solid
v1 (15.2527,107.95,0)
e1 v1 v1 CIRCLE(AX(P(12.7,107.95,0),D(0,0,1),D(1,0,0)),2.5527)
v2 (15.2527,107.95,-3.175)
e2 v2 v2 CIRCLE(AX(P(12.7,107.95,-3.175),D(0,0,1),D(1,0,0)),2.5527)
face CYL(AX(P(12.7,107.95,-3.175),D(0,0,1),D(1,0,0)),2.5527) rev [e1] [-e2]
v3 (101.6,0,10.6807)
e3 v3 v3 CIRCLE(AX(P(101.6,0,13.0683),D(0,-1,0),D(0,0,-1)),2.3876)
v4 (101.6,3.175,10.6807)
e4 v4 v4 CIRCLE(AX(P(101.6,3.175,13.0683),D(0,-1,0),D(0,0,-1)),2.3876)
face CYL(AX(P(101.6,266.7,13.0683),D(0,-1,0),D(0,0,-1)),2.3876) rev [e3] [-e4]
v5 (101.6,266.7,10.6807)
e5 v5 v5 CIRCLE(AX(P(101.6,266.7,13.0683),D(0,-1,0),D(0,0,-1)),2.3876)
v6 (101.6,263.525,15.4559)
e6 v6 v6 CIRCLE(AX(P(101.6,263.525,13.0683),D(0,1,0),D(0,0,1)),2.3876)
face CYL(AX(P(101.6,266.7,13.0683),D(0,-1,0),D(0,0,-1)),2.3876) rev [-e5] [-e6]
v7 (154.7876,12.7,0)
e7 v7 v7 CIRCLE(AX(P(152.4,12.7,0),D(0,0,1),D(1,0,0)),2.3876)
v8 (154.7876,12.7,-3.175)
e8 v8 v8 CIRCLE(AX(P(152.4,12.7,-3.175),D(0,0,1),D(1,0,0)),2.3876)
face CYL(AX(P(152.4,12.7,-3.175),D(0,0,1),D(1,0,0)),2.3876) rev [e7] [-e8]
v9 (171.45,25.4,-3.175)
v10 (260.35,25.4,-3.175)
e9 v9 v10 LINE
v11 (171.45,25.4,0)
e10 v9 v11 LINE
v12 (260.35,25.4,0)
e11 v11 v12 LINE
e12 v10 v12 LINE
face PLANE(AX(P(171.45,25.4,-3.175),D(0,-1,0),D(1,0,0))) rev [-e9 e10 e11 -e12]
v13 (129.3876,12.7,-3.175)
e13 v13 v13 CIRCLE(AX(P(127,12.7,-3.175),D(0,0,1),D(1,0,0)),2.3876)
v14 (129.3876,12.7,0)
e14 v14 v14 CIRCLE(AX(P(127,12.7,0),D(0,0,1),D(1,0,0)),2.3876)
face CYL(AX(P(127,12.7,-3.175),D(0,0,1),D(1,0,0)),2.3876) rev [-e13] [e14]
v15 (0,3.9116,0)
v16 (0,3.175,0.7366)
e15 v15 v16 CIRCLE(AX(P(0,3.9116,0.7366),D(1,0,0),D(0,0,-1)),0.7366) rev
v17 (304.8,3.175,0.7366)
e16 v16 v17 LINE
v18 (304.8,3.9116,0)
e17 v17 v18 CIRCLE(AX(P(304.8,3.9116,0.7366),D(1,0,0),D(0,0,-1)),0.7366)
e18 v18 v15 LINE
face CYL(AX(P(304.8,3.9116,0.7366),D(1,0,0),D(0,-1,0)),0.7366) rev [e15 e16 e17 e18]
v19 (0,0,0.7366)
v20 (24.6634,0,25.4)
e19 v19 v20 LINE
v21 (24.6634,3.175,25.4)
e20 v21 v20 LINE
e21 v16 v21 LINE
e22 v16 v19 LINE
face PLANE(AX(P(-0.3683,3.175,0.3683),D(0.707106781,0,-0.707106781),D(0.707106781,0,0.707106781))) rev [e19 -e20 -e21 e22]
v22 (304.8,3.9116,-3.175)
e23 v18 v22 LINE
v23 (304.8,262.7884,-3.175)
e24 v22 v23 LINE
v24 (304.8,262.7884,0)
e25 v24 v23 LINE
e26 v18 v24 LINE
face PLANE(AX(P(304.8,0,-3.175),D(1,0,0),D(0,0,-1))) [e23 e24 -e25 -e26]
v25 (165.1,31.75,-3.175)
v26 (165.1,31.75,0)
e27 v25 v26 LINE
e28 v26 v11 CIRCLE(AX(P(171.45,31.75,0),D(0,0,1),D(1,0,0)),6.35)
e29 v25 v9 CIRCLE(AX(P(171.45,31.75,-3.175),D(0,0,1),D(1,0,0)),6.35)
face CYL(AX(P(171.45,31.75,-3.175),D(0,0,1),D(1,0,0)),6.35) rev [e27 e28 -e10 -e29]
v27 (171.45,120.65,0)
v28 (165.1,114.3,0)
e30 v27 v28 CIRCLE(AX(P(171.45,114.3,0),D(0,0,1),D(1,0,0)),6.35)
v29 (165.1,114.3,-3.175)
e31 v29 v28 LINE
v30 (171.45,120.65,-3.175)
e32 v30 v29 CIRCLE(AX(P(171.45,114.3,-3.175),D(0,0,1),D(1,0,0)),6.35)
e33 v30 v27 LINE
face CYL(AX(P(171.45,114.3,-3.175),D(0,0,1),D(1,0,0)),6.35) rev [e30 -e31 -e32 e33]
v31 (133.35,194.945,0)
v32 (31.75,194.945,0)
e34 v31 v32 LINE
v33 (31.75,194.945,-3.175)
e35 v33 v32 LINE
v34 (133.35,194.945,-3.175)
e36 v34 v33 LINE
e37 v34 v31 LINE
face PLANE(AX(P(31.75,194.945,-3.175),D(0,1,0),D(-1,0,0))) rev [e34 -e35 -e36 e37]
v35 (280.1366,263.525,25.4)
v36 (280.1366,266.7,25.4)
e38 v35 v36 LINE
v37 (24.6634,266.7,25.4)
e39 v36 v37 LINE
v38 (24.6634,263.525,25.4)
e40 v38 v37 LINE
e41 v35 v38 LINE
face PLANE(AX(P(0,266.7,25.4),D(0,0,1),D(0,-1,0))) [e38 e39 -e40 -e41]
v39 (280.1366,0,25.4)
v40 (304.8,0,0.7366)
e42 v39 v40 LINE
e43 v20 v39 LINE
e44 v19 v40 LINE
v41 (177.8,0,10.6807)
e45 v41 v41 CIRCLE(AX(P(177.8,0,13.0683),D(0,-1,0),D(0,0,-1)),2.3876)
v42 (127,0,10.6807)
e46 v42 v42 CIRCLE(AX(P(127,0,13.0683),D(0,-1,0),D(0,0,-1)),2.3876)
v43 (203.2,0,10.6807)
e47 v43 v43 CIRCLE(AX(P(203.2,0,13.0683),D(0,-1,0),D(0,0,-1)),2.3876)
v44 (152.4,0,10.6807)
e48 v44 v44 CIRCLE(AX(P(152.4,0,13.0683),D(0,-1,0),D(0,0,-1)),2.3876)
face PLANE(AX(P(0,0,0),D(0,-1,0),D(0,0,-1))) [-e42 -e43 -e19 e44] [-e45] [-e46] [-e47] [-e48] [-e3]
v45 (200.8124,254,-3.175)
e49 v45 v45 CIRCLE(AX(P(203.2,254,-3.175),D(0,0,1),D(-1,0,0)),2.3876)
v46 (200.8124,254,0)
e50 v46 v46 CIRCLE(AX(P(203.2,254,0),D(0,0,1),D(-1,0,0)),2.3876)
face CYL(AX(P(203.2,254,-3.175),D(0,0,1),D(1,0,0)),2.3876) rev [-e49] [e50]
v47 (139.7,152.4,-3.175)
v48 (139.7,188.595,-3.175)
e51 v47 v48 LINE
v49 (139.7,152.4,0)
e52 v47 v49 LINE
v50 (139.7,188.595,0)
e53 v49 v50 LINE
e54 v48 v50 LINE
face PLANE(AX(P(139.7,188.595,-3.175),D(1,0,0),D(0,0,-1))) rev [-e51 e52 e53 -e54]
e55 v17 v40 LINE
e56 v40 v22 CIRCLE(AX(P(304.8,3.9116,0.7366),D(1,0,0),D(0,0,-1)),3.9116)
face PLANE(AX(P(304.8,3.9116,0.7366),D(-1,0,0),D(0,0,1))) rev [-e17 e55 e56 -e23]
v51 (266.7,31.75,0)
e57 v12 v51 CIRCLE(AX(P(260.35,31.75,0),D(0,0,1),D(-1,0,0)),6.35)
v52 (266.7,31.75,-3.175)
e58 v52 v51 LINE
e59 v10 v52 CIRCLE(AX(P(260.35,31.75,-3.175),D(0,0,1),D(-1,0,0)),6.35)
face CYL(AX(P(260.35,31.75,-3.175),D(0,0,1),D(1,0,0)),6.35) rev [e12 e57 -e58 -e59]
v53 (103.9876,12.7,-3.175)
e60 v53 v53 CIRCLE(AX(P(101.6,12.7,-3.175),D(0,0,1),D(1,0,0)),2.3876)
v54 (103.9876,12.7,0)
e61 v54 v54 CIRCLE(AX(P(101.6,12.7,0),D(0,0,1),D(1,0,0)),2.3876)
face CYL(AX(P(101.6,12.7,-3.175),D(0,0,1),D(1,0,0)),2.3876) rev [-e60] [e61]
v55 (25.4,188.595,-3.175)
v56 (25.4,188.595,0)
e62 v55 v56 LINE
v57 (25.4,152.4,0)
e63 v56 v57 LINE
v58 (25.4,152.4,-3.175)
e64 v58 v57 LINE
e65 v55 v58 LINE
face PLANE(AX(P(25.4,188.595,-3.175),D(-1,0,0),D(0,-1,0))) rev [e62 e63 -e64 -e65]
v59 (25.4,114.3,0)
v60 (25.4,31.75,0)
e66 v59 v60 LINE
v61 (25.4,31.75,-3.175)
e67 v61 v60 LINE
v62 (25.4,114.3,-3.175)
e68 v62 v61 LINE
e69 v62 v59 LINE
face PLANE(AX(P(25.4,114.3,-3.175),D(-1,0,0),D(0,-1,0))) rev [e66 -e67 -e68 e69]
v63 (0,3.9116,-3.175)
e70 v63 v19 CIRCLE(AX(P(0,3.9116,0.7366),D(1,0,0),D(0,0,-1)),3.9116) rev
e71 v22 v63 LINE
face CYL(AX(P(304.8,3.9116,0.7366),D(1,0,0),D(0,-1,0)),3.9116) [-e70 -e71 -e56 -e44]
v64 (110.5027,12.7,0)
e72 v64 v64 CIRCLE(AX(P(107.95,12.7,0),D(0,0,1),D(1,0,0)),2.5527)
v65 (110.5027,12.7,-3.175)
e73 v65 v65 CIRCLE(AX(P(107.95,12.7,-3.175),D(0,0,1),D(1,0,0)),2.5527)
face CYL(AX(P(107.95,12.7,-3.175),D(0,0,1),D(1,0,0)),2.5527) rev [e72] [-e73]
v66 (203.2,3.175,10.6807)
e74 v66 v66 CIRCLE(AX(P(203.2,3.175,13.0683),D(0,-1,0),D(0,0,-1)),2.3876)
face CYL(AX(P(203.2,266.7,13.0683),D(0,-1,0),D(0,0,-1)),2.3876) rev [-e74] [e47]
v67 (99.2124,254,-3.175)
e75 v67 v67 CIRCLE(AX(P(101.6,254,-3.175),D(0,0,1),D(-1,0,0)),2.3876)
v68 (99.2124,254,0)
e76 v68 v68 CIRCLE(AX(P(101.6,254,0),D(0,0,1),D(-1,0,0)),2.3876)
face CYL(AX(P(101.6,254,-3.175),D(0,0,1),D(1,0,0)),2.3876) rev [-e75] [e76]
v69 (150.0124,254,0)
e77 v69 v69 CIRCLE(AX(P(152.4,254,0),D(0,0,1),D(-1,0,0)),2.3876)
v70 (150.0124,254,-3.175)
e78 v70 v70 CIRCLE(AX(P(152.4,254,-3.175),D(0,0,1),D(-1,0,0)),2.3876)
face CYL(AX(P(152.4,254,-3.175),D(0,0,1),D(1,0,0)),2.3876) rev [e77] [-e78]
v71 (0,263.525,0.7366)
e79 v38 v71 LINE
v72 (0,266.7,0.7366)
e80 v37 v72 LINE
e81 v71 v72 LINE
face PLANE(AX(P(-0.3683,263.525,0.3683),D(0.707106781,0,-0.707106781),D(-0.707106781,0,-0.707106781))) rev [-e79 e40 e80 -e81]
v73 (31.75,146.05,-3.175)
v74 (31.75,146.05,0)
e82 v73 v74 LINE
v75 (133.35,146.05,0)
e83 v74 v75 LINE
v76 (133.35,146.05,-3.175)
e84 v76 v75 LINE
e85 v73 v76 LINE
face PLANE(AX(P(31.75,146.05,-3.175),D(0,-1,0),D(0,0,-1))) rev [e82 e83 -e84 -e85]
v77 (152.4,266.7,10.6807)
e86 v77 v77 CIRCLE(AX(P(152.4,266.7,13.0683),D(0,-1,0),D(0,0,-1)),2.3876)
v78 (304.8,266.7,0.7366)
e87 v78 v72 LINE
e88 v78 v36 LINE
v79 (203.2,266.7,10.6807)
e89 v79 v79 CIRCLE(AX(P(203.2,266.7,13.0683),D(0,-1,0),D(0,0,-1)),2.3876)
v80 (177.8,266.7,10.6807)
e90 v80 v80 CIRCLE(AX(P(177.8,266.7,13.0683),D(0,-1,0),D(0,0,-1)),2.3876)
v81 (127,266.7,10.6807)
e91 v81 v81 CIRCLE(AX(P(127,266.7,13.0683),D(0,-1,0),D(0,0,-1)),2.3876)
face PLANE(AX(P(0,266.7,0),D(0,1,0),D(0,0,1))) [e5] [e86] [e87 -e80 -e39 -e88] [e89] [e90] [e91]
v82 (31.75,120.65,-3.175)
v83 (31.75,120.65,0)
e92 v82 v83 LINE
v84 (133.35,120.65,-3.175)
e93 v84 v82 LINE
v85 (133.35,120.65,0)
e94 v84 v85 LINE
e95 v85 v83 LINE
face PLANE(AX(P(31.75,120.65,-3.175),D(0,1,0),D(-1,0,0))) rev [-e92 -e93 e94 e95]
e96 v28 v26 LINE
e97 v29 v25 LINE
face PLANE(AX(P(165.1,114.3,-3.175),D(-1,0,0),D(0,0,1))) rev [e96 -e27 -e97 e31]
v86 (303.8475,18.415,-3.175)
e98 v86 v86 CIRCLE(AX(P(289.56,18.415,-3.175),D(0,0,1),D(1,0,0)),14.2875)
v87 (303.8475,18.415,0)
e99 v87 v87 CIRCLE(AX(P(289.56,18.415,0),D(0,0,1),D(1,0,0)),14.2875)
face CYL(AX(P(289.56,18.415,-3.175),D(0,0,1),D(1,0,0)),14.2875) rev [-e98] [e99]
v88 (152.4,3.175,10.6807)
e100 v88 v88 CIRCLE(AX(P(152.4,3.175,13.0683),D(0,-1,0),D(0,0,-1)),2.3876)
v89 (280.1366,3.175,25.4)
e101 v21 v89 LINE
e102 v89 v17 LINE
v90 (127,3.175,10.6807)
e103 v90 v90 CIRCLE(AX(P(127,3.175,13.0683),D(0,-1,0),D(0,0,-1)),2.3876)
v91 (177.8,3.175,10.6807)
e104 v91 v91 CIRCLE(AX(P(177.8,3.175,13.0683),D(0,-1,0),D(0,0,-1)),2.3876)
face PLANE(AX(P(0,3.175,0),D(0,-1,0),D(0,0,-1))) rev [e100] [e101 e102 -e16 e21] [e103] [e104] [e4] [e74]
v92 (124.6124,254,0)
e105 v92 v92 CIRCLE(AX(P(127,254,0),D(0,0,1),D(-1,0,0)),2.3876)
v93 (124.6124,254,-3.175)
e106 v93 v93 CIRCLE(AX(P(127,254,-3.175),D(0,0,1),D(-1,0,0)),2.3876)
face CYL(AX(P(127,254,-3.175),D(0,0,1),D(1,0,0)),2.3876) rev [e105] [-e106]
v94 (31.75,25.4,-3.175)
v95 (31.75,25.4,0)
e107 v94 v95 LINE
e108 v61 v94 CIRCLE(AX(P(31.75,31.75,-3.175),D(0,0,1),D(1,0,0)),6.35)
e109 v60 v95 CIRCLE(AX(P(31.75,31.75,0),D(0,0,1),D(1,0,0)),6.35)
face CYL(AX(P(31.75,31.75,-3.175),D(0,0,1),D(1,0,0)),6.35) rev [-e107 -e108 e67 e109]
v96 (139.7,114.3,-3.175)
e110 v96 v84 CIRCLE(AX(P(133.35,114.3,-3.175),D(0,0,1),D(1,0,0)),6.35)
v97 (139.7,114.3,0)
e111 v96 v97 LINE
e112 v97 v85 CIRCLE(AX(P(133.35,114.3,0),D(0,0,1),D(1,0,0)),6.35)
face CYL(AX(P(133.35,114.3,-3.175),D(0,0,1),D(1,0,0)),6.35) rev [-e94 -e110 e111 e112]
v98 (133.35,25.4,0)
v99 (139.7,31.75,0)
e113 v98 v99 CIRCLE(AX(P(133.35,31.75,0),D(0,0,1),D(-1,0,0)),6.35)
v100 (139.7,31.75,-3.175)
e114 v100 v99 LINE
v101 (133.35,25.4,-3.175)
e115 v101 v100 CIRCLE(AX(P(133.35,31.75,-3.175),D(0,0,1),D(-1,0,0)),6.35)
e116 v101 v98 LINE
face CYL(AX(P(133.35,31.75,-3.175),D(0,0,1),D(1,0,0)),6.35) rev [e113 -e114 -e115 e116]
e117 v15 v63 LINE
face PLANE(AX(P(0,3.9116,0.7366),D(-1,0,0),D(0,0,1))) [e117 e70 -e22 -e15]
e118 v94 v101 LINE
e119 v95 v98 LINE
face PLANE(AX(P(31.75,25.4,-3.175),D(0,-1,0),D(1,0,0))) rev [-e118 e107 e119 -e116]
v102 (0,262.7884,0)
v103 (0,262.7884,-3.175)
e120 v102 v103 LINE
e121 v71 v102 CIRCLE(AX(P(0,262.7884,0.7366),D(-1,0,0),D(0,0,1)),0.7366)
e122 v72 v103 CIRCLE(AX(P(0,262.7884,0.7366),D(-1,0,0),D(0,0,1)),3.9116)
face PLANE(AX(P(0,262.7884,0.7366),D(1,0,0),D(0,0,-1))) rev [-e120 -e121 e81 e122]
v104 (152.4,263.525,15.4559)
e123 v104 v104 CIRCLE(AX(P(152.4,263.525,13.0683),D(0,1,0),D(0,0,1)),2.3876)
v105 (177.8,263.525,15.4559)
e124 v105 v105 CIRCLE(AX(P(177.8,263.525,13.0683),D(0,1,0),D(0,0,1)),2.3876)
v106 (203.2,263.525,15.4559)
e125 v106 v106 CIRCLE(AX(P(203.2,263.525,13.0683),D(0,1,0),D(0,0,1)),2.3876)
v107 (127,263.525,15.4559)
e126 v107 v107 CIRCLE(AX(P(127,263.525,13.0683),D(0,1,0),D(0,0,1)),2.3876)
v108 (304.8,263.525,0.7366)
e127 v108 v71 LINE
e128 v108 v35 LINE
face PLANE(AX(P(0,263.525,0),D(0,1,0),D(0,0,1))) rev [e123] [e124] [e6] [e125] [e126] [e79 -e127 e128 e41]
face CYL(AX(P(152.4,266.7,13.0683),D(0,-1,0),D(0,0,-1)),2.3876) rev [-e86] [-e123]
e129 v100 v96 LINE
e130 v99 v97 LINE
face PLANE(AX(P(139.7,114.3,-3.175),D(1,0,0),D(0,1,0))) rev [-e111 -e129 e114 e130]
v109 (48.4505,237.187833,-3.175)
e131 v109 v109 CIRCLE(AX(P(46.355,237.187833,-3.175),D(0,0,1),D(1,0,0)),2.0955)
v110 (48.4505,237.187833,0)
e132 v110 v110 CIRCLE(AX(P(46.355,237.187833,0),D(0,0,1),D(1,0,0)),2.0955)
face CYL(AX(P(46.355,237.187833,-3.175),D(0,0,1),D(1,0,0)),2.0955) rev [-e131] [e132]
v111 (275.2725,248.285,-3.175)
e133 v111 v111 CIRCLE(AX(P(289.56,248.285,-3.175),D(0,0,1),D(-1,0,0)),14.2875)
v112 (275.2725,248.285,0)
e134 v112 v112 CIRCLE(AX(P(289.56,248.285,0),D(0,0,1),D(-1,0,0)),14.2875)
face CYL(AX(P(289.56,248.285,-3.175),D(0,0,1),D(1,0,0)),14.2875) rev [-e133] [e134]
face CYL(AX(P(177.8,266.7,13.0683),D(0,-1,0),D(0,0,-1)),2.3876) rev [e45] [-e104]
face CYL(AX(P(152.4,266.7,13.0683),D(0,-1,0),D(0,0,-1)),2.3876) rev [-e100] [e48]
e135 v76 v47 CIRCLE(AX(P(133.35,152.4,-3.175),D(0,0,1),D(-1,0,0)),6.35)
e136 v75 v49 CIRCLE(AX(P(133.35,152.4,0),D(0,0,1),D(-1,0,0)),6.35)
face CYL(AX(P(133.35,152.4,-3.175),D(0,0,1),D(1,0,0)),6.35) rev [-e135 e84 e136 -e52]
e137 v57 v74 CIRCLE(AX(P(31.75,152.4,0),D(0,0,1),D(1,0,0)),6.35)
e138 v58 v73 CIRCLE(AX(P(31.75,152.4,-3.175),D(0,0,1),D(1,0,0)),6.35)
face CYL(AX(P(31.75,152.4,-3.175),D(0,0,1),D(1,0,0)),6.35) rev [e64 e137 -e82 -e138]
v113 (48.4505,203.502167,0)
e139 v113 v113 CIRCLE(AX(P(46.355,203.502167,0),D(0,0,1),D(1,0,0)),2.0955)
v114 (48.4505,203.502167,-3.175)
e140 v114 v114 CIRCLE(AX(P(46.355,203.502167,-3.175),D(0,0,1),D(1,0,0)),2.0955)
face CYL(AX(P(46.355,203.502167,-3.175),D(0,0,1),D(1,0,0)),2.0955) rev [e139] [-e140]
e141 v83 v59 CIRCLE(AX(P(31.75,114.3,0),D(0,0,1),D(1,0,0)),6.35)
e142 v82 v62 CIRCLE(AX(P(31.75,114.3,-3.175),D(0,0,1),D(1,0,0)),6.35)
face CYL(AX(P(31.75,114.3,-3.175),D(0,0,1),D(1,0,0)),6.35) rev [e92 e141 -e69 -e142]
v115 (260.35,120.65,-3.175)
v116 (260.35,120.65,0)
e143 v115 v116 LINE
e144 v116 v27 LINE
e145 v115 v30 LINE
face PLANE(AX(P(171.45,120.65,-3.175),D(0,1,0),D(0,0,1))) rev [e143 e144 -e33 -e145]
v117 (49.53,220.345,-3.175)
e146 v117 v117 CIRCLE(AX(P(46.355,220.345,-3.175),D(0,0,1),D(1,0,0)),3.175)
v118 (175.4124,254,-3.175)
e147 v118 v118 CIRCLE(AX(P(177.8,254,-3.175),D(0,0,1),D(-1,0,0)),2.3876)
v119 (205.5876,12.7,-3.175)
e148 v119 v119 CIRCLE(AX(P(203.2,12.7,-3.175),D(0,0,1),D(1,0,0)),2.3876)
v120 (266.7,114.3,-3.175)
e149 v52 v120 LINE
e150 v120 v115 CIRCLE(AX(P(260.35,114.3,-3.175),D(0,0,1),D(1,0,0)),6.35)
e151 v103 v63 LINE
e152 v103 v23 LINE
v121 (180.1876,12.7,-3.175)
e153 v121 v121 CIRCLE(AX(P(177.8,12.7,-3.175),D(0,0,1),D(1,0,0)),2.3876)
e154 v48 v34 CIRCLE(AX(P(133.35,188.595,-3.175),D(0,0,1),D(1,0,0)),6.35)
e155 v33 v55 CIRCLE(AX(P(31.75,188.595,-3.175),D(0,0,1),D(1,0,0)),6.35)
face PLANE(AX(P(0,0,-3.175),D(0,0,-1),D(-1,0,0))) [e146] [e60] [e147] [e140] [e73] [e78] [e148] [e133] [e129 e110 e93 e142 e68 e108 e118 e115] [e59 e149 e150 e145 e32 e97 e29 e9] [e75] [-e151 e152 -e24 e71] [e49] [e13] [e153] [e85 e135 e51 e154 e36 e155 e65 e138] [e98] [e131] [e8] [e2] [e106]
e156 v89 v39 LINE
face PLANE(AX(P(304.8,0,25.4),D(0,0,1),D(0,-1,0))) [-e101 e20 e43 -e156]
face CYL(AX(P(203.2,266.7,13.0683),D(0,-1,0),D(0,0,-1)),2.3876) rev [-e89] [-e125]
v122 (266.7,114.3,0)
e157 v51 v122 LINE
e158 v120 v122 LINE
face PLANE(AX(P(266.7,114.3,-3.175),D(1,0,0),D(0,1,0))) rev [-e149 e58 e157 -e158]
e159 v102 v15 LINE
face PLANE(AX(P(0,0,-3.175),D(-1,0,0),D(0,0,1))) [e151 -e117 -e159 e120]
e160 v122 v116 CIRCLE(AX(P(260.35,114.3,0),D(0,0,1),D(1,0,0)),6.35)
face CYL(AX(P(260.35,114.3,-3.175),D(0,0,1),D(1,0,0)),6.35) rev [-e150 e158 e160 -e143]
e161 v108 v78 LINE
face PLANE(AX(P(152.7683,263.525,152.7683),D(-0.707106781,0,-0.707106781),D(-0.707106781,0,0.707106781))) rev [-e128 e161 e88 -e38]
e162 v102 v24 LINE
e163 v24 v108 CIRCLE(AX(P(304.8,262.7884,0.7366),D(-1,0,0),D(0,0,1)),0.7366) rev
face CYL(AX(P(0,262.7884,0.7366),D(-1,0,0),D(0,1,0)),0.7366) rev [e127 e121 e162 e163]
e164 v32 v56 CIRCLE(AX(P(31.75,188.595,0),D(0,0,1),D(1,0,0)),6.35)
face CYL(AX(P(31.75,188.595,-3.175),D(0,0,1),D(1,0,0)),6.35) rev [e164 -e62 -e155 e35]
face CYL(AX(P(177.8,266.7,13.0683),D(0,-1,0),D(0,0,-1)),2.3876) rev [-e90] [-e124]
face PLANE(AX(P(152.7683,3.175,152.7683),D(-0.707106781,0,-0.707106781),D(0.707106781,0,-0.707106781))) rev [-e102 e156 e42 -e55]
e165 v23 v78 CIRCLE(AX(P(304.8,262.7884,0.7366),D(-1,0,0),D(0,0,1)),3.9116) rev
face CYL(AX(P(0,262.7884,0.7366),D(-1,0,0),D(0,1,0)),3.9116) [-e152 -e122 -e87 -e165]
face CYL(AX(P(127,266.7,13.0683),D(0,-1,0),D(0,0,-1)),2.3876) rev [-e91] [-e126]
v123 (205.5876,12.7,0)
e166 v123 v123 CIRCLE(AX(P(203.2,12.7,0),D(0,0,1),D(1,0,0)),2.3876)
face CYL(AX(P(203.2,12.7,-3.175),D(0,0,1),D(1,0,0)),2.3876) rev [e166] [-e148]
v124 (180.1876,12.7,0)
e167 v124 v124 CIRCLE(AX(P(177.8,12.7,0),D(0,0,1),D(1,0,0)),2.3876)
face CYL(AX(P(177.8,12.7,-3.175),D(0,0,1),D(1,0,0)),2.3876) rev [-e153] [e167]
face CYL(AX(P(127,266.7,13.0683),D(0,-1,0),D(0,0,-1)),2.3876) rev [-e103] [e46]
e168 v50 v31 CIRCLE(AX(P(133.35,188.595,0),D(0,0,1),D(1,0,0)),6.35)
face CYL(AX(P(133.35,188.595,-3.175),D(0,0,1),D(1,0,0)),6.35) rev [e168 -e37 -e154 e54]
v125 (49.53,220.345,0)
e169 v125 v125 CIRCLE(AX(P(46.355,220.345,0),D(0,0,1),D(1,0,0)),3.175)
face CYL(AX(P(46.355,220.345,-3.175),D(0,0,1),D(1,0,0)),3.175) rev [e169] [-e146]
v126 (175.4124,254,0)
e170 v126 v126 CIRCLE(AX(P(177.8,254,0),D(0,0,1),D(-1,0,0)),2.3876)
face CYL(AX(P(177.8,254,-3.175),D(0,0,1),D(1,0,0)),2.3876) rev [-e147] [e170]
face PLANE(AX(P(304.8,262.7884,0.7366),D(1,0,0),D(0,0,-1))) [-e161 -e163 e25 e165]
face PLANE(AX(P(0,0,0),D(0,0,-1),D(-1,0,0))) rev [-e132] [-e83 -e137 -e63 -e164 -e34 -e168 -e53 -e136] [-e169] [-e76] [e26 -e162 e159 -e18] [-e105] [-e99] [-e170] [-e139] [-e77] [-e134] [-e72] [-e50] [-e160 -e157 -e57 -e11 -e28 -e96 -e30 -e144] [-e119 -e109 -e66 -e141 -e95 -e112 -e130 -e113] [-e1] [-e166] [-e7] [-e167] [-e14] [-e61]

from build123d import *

# Parameters (mm, degrees)
SKETCH1_W                    = 304.8
SKETCH1_H                    = 266.7
SKETCH1_R                    = 14.2875
SKETCH1_R_2                  = 3.175
SKETCH1_R_3                  = 2.0955
SKETCH1_R_4                  = 2.3876
SKETCH1_R_5                  = 2.5527
BASE_FLANGE1_DEPTH           = 3.175
EDGE_FLANGE1_STRIP_W         = 14.1732
EDGE_FLANGE1_STRIP_H         = 3.175
EDGE_FLANGE1_STRIP_CUT_DEPTH = 304.8
EDGE_FLANGE1_DEPTH           = 304.8
EDGE_FLANGE2_STRIP_W         = 14.1732
EDGE_FLANGE2_STRIP_H         = 3.175
EDGE_FLANGE2_STRIP_CUT_DEPTH = 304.8
EDGE_FLANGE2_DEPTH           = 304.8
CUT_EXTRUDE1_DEPTH           = 406.80425084
CUT_EXTRUDE2_DEPTH           = 406.80425084
SKETCH15_R                   = 2.3876
CUT_EXTRUDE3_DEPTH           = 406.80425084


# Sheet-metal steps are written as plain solids
with BuildPart() as part:
    # Sketch1 → Base-Flange1 (new body)
    with BuildSketch(Plane.XY):
        with Locations((152.4, 133.35)):
            Rectangle(SKETCH1_W, SKETCH1_H)
        with Locations((289.56, 18.415)):
            Circle(SKETCH1_R, mode=Mode.SUBTRACT)
        with Locations(Location((289.56, 248.285, 0), (0, 0, 180))):
            Circle(SKETCH1_R, mode=Mode.SUBTRACT)
        with Locations((46.355, 220.345)):
            Circle(SKETCH1_R_2, mode=Mode.SUBTRACT)
        with Locations((46.355, 237.187832598)):
            Circle(SKETCH1_R_3, mode=Mode.SUBTRACT)
        with Locations((46.355, 203.502167402)):
            Circle(SKETCH1_R_3, mode=Mode.SUBTRACT)
        with Locations((152.4, 12.7)):
            Circle(SKETCH1_R_4, mode=Mode.SUBTRACT)
        with Locations((177.8, 12.7)):
            Circle(SKETCH1_R_4, mode=Mode.SUBTRACT)
        with Locations((203.2, 12.7)):
            Circle(SKETCH1_R_4, mode=Mode.SUBTRACT)
        with Locations((127, 12.7)):
            Circle(SKETCH1_R_4, mode=Mode.SUBTRACT)
        with Locations((101.6, 12.7)):
            Circle(SKETCH1_R_4, mode=Mode.SUBTRACT)
        with Locations(Location((101.6, 254, 0), (0, 0, 180))):
            Circle(SKETCH1_R_4, mode=Mode.SUBTRACT)
        with Locations(Location((127, 254, 0), (0, 0, 180))):
            Circle(SKETCH1_R_4, mode=Mode.SUBTRACT)
        with Locations(Location((203.2, 254, 0), (0, 0, 180))):
            Circle(SKETCH1_R_4, mode=Mode.SUBTRACT)
        with Locations(Location((177.8, 254, 0), (0, 0, 180))):
            Circle(SKETCH1_R_4, mode=Mode.SUBTRACT)
        with Locations(Location((152.4, 254, 0), (0, 0, 180))):
            Circle(SKETCH1_R_4, mode=Mode.SUBTRACT)
        with Locations((107.95, 12.7)):
            Circle(SKETCH1_R_5, mode=Mode.SUBTRACT)
        with Locations((12.7, 107.95)):
            Circle(SKETCH1_R_5, mode=Mode.SUBTRACT)
        with BuildLine():
            Line((171.45, 120.65), (260.35, 120.65))
            ThreePointArc((260.35, 120.65), (264.840128061, 118.790128061), (266.7, 114.3))
            Line((266.7, 114.3), (266.7, 31.75))
            ThreePointArc((266.7, 31.75), (264.840128061, 27.259871939), (260.35, 25.4))
            Line((260.35, 25.4), (171.45, 25.4))
            ThreePointArc((171.45, 25.4), (166.959871939, 27.259871939), (165.1, 31.75))
            Line((165.1, 31.75), (165.1, 114.3))
            ThreePointArc((165.1, 114.3), (166.959871939, 118.790128061), (171.45, 120.65))
        make_face(mode=Mode.SUBTRACT)
        with BuildLine():
            Line((31.75, 120.65), (133.35, 120.65))
            ThreePointArc((133.35, 120.65), (137.840128061, 118.790128061), (139.7, 114.3))
            Line((139.7, 114.3), (139.7, 31.75))
            ThreePointArc((139.7, 31.75), (137.840128061, 27.259871939), (133.35, 25.4))
            Line((133.35, 25.4), (31.75, 25.4))
            ThreePointArc((31.75, 25.4), (27.259871939, 27.259871939), (25.4, 31.75))
            Line((25.4, 31.75), (25.4, 114.3))
            ThreePointArc((25.4, 114.3), (27.259871939, 118.790128061), (31.75, 120.65))
        make_face(mode=Mode.SUBTRACT)
        with BuildLine():
            Line((31.75, 194.945), (133.35, 194.945))
            ThreePointArc((133.35, 194.945), (137.840128061, 193.085128061), (139.7, 188.595))
            Line((139.7, 188.595), (139.7, 152.4))
            ThreePointArc((139.7, 152.4), (137.840128061, 147.909871939), (133.35, 146.05))
            Line((133.35, 146.05), (31.75, 146.05))
            ThreePointArc((31.75, 146.05), (27.259871939, 147.909871939), (25.4, 152.4))
            Line((25.4, 152.4), (25.4, 188.595))
            ThreePointArc((25.4, 188.595), (27.259871939, 193.085128061), (31.75, 194.945))
        make_face(mode=Mode.SUBTRACT)
    extrude(amount=-BASE_FLANGE1_DEPTH)

    # Edge-Flange1 strip (across the edge) → Edge-Flange1 strip cut (cut)
    with BuildSketch(Plane(origin=(304.8, 266.7, 0), x_dir=(0, -1, 0), z_dir=(-1, 0, 0))):
        with Locations((-3.175, -1.5875)):
            Rectangle(EDGE_FLANGE1_STRIP_W, EDGE_FLANGE1_STRIP_H)
    extrude(amount=EDGE_FLANGE1_STRIP_CUT_DEPTH, mode=Mode.SUBTRACT)

    # Edge-Flange1 section (across the edge) → Edge-Flange1 (add)
    with BuildSketch(Plane(origin=(304.8, 266.7, 0), x_dir=(0, -1, 0), z_dir=(-1, 0, 0))):
        with BuildLine():
            Line((0, 0.7366), (0, 25.4))
            Line((0, 25.4), (3.175, 25.4))
            Line((3.175, 25.4), (3.175, 0.7366))
            ThreePointArc((3.175, 0.7366), (3.390745145, 0.215745145), (3.9116, 0))
            Line((3.9116, 0), (3.9116, -3.175))
            ThreePointArc((3.9116, -3.175), (1.145681115, -2.029318885), (0, 0.7366))
        make_face()
    extrude(amount=EDGE_FLANGE1_DEPTH)

    # Edge-Flange2 strip (across the edge) → Edge-Flange2 strip cut (cut)
    with BuildSketch(Plane.YZ):
        with Locations((-3.175, -1.5875)):
            Rectangle(EDGE_FLANGE2_STRIP_W, EDGE_FLANGE2_STRIP_H)
    extrude(amount=EDGE_FLANGE2_STRIP_CUT_DEPTH, mode=Mode.SUBTRACT)

    # Edge-Flange2 section (across the edge) → Edge-Flange2 (add)
    with BuildSketch(Plane.YZ):
        with BuildLine():
            Line((0, 0.7366), (0, 25.4))
            Line((0, 25.4), (3.175, 25.4))
            Line((3.175, 25.4), (3.175, 0.7366))
            ThreePointArc((3.175, 0.7366), (3.390745145, 0.215745145), (3.9116, 0))
            Line((3.9116, 0), (3.9116, -3.175))
            ThreePointArc((3.9116, -3.175), (1.145681115, -2.029318885), (0, 0.7366))
        make_face()
    extrude(amount=EDGE_FLANGE2_DEPTH)

    # Sketch12 → Cut-Extrude1 (cut, through all)
    with BuildSketch(Plane(origin=(0, 0, 0), x_dir=(-1, 0, 0), z_dir=(0, -1, 0))):
        Polygon((-304.8, -0.7366), (-280.1366, -25.4), (-304.8, -25.4), align=None)
    extrude(amount=-CUT_EXTRUDE1_DEPTH, mode=Mode.SUBTRACT)

    # Sketch14 → Cut-Extrude2 (cut, through all)
    with BuildSketch(Plane.XZ):
        Polygon((0, 0.7366), (24.6634, 25.4), (0, 25.4), align=None)
    extrude(amount=-CUT_EXTRUDE2_DEPTH, mode=Mode.SUBTRACT)

    # Sketch15 → Cut-Extrude3 (cut, through all)
    with BuildSketch(Plane.XZ):
        with Locations(Location((152.4, 13.0683, 0), (0, 0, 270))):
            Circle(SKETCH15_R)
        with Locations(Location((177.8, 13.0683, 0), (0, 0, 270))):
            Circle(SKETCH15_R)
        with Locations(Location((203.2, 13.0683, 0), (0, 0, 270))):
            Circle(SKETCH15_R)
        with Locations(Location((127, 13.0683, 0), (0, 0, 270))):
            Circle(SKETCH15_R)
        with Locations(Location((101.6, 13.0683, 0), (0, 0, 270))):
            Circle(SKETCH15_R)
    extrude(amount=-CUT_EXTRUDE3_DEPTH, mode=Mode.SUBTRACT)


solid = part.part
